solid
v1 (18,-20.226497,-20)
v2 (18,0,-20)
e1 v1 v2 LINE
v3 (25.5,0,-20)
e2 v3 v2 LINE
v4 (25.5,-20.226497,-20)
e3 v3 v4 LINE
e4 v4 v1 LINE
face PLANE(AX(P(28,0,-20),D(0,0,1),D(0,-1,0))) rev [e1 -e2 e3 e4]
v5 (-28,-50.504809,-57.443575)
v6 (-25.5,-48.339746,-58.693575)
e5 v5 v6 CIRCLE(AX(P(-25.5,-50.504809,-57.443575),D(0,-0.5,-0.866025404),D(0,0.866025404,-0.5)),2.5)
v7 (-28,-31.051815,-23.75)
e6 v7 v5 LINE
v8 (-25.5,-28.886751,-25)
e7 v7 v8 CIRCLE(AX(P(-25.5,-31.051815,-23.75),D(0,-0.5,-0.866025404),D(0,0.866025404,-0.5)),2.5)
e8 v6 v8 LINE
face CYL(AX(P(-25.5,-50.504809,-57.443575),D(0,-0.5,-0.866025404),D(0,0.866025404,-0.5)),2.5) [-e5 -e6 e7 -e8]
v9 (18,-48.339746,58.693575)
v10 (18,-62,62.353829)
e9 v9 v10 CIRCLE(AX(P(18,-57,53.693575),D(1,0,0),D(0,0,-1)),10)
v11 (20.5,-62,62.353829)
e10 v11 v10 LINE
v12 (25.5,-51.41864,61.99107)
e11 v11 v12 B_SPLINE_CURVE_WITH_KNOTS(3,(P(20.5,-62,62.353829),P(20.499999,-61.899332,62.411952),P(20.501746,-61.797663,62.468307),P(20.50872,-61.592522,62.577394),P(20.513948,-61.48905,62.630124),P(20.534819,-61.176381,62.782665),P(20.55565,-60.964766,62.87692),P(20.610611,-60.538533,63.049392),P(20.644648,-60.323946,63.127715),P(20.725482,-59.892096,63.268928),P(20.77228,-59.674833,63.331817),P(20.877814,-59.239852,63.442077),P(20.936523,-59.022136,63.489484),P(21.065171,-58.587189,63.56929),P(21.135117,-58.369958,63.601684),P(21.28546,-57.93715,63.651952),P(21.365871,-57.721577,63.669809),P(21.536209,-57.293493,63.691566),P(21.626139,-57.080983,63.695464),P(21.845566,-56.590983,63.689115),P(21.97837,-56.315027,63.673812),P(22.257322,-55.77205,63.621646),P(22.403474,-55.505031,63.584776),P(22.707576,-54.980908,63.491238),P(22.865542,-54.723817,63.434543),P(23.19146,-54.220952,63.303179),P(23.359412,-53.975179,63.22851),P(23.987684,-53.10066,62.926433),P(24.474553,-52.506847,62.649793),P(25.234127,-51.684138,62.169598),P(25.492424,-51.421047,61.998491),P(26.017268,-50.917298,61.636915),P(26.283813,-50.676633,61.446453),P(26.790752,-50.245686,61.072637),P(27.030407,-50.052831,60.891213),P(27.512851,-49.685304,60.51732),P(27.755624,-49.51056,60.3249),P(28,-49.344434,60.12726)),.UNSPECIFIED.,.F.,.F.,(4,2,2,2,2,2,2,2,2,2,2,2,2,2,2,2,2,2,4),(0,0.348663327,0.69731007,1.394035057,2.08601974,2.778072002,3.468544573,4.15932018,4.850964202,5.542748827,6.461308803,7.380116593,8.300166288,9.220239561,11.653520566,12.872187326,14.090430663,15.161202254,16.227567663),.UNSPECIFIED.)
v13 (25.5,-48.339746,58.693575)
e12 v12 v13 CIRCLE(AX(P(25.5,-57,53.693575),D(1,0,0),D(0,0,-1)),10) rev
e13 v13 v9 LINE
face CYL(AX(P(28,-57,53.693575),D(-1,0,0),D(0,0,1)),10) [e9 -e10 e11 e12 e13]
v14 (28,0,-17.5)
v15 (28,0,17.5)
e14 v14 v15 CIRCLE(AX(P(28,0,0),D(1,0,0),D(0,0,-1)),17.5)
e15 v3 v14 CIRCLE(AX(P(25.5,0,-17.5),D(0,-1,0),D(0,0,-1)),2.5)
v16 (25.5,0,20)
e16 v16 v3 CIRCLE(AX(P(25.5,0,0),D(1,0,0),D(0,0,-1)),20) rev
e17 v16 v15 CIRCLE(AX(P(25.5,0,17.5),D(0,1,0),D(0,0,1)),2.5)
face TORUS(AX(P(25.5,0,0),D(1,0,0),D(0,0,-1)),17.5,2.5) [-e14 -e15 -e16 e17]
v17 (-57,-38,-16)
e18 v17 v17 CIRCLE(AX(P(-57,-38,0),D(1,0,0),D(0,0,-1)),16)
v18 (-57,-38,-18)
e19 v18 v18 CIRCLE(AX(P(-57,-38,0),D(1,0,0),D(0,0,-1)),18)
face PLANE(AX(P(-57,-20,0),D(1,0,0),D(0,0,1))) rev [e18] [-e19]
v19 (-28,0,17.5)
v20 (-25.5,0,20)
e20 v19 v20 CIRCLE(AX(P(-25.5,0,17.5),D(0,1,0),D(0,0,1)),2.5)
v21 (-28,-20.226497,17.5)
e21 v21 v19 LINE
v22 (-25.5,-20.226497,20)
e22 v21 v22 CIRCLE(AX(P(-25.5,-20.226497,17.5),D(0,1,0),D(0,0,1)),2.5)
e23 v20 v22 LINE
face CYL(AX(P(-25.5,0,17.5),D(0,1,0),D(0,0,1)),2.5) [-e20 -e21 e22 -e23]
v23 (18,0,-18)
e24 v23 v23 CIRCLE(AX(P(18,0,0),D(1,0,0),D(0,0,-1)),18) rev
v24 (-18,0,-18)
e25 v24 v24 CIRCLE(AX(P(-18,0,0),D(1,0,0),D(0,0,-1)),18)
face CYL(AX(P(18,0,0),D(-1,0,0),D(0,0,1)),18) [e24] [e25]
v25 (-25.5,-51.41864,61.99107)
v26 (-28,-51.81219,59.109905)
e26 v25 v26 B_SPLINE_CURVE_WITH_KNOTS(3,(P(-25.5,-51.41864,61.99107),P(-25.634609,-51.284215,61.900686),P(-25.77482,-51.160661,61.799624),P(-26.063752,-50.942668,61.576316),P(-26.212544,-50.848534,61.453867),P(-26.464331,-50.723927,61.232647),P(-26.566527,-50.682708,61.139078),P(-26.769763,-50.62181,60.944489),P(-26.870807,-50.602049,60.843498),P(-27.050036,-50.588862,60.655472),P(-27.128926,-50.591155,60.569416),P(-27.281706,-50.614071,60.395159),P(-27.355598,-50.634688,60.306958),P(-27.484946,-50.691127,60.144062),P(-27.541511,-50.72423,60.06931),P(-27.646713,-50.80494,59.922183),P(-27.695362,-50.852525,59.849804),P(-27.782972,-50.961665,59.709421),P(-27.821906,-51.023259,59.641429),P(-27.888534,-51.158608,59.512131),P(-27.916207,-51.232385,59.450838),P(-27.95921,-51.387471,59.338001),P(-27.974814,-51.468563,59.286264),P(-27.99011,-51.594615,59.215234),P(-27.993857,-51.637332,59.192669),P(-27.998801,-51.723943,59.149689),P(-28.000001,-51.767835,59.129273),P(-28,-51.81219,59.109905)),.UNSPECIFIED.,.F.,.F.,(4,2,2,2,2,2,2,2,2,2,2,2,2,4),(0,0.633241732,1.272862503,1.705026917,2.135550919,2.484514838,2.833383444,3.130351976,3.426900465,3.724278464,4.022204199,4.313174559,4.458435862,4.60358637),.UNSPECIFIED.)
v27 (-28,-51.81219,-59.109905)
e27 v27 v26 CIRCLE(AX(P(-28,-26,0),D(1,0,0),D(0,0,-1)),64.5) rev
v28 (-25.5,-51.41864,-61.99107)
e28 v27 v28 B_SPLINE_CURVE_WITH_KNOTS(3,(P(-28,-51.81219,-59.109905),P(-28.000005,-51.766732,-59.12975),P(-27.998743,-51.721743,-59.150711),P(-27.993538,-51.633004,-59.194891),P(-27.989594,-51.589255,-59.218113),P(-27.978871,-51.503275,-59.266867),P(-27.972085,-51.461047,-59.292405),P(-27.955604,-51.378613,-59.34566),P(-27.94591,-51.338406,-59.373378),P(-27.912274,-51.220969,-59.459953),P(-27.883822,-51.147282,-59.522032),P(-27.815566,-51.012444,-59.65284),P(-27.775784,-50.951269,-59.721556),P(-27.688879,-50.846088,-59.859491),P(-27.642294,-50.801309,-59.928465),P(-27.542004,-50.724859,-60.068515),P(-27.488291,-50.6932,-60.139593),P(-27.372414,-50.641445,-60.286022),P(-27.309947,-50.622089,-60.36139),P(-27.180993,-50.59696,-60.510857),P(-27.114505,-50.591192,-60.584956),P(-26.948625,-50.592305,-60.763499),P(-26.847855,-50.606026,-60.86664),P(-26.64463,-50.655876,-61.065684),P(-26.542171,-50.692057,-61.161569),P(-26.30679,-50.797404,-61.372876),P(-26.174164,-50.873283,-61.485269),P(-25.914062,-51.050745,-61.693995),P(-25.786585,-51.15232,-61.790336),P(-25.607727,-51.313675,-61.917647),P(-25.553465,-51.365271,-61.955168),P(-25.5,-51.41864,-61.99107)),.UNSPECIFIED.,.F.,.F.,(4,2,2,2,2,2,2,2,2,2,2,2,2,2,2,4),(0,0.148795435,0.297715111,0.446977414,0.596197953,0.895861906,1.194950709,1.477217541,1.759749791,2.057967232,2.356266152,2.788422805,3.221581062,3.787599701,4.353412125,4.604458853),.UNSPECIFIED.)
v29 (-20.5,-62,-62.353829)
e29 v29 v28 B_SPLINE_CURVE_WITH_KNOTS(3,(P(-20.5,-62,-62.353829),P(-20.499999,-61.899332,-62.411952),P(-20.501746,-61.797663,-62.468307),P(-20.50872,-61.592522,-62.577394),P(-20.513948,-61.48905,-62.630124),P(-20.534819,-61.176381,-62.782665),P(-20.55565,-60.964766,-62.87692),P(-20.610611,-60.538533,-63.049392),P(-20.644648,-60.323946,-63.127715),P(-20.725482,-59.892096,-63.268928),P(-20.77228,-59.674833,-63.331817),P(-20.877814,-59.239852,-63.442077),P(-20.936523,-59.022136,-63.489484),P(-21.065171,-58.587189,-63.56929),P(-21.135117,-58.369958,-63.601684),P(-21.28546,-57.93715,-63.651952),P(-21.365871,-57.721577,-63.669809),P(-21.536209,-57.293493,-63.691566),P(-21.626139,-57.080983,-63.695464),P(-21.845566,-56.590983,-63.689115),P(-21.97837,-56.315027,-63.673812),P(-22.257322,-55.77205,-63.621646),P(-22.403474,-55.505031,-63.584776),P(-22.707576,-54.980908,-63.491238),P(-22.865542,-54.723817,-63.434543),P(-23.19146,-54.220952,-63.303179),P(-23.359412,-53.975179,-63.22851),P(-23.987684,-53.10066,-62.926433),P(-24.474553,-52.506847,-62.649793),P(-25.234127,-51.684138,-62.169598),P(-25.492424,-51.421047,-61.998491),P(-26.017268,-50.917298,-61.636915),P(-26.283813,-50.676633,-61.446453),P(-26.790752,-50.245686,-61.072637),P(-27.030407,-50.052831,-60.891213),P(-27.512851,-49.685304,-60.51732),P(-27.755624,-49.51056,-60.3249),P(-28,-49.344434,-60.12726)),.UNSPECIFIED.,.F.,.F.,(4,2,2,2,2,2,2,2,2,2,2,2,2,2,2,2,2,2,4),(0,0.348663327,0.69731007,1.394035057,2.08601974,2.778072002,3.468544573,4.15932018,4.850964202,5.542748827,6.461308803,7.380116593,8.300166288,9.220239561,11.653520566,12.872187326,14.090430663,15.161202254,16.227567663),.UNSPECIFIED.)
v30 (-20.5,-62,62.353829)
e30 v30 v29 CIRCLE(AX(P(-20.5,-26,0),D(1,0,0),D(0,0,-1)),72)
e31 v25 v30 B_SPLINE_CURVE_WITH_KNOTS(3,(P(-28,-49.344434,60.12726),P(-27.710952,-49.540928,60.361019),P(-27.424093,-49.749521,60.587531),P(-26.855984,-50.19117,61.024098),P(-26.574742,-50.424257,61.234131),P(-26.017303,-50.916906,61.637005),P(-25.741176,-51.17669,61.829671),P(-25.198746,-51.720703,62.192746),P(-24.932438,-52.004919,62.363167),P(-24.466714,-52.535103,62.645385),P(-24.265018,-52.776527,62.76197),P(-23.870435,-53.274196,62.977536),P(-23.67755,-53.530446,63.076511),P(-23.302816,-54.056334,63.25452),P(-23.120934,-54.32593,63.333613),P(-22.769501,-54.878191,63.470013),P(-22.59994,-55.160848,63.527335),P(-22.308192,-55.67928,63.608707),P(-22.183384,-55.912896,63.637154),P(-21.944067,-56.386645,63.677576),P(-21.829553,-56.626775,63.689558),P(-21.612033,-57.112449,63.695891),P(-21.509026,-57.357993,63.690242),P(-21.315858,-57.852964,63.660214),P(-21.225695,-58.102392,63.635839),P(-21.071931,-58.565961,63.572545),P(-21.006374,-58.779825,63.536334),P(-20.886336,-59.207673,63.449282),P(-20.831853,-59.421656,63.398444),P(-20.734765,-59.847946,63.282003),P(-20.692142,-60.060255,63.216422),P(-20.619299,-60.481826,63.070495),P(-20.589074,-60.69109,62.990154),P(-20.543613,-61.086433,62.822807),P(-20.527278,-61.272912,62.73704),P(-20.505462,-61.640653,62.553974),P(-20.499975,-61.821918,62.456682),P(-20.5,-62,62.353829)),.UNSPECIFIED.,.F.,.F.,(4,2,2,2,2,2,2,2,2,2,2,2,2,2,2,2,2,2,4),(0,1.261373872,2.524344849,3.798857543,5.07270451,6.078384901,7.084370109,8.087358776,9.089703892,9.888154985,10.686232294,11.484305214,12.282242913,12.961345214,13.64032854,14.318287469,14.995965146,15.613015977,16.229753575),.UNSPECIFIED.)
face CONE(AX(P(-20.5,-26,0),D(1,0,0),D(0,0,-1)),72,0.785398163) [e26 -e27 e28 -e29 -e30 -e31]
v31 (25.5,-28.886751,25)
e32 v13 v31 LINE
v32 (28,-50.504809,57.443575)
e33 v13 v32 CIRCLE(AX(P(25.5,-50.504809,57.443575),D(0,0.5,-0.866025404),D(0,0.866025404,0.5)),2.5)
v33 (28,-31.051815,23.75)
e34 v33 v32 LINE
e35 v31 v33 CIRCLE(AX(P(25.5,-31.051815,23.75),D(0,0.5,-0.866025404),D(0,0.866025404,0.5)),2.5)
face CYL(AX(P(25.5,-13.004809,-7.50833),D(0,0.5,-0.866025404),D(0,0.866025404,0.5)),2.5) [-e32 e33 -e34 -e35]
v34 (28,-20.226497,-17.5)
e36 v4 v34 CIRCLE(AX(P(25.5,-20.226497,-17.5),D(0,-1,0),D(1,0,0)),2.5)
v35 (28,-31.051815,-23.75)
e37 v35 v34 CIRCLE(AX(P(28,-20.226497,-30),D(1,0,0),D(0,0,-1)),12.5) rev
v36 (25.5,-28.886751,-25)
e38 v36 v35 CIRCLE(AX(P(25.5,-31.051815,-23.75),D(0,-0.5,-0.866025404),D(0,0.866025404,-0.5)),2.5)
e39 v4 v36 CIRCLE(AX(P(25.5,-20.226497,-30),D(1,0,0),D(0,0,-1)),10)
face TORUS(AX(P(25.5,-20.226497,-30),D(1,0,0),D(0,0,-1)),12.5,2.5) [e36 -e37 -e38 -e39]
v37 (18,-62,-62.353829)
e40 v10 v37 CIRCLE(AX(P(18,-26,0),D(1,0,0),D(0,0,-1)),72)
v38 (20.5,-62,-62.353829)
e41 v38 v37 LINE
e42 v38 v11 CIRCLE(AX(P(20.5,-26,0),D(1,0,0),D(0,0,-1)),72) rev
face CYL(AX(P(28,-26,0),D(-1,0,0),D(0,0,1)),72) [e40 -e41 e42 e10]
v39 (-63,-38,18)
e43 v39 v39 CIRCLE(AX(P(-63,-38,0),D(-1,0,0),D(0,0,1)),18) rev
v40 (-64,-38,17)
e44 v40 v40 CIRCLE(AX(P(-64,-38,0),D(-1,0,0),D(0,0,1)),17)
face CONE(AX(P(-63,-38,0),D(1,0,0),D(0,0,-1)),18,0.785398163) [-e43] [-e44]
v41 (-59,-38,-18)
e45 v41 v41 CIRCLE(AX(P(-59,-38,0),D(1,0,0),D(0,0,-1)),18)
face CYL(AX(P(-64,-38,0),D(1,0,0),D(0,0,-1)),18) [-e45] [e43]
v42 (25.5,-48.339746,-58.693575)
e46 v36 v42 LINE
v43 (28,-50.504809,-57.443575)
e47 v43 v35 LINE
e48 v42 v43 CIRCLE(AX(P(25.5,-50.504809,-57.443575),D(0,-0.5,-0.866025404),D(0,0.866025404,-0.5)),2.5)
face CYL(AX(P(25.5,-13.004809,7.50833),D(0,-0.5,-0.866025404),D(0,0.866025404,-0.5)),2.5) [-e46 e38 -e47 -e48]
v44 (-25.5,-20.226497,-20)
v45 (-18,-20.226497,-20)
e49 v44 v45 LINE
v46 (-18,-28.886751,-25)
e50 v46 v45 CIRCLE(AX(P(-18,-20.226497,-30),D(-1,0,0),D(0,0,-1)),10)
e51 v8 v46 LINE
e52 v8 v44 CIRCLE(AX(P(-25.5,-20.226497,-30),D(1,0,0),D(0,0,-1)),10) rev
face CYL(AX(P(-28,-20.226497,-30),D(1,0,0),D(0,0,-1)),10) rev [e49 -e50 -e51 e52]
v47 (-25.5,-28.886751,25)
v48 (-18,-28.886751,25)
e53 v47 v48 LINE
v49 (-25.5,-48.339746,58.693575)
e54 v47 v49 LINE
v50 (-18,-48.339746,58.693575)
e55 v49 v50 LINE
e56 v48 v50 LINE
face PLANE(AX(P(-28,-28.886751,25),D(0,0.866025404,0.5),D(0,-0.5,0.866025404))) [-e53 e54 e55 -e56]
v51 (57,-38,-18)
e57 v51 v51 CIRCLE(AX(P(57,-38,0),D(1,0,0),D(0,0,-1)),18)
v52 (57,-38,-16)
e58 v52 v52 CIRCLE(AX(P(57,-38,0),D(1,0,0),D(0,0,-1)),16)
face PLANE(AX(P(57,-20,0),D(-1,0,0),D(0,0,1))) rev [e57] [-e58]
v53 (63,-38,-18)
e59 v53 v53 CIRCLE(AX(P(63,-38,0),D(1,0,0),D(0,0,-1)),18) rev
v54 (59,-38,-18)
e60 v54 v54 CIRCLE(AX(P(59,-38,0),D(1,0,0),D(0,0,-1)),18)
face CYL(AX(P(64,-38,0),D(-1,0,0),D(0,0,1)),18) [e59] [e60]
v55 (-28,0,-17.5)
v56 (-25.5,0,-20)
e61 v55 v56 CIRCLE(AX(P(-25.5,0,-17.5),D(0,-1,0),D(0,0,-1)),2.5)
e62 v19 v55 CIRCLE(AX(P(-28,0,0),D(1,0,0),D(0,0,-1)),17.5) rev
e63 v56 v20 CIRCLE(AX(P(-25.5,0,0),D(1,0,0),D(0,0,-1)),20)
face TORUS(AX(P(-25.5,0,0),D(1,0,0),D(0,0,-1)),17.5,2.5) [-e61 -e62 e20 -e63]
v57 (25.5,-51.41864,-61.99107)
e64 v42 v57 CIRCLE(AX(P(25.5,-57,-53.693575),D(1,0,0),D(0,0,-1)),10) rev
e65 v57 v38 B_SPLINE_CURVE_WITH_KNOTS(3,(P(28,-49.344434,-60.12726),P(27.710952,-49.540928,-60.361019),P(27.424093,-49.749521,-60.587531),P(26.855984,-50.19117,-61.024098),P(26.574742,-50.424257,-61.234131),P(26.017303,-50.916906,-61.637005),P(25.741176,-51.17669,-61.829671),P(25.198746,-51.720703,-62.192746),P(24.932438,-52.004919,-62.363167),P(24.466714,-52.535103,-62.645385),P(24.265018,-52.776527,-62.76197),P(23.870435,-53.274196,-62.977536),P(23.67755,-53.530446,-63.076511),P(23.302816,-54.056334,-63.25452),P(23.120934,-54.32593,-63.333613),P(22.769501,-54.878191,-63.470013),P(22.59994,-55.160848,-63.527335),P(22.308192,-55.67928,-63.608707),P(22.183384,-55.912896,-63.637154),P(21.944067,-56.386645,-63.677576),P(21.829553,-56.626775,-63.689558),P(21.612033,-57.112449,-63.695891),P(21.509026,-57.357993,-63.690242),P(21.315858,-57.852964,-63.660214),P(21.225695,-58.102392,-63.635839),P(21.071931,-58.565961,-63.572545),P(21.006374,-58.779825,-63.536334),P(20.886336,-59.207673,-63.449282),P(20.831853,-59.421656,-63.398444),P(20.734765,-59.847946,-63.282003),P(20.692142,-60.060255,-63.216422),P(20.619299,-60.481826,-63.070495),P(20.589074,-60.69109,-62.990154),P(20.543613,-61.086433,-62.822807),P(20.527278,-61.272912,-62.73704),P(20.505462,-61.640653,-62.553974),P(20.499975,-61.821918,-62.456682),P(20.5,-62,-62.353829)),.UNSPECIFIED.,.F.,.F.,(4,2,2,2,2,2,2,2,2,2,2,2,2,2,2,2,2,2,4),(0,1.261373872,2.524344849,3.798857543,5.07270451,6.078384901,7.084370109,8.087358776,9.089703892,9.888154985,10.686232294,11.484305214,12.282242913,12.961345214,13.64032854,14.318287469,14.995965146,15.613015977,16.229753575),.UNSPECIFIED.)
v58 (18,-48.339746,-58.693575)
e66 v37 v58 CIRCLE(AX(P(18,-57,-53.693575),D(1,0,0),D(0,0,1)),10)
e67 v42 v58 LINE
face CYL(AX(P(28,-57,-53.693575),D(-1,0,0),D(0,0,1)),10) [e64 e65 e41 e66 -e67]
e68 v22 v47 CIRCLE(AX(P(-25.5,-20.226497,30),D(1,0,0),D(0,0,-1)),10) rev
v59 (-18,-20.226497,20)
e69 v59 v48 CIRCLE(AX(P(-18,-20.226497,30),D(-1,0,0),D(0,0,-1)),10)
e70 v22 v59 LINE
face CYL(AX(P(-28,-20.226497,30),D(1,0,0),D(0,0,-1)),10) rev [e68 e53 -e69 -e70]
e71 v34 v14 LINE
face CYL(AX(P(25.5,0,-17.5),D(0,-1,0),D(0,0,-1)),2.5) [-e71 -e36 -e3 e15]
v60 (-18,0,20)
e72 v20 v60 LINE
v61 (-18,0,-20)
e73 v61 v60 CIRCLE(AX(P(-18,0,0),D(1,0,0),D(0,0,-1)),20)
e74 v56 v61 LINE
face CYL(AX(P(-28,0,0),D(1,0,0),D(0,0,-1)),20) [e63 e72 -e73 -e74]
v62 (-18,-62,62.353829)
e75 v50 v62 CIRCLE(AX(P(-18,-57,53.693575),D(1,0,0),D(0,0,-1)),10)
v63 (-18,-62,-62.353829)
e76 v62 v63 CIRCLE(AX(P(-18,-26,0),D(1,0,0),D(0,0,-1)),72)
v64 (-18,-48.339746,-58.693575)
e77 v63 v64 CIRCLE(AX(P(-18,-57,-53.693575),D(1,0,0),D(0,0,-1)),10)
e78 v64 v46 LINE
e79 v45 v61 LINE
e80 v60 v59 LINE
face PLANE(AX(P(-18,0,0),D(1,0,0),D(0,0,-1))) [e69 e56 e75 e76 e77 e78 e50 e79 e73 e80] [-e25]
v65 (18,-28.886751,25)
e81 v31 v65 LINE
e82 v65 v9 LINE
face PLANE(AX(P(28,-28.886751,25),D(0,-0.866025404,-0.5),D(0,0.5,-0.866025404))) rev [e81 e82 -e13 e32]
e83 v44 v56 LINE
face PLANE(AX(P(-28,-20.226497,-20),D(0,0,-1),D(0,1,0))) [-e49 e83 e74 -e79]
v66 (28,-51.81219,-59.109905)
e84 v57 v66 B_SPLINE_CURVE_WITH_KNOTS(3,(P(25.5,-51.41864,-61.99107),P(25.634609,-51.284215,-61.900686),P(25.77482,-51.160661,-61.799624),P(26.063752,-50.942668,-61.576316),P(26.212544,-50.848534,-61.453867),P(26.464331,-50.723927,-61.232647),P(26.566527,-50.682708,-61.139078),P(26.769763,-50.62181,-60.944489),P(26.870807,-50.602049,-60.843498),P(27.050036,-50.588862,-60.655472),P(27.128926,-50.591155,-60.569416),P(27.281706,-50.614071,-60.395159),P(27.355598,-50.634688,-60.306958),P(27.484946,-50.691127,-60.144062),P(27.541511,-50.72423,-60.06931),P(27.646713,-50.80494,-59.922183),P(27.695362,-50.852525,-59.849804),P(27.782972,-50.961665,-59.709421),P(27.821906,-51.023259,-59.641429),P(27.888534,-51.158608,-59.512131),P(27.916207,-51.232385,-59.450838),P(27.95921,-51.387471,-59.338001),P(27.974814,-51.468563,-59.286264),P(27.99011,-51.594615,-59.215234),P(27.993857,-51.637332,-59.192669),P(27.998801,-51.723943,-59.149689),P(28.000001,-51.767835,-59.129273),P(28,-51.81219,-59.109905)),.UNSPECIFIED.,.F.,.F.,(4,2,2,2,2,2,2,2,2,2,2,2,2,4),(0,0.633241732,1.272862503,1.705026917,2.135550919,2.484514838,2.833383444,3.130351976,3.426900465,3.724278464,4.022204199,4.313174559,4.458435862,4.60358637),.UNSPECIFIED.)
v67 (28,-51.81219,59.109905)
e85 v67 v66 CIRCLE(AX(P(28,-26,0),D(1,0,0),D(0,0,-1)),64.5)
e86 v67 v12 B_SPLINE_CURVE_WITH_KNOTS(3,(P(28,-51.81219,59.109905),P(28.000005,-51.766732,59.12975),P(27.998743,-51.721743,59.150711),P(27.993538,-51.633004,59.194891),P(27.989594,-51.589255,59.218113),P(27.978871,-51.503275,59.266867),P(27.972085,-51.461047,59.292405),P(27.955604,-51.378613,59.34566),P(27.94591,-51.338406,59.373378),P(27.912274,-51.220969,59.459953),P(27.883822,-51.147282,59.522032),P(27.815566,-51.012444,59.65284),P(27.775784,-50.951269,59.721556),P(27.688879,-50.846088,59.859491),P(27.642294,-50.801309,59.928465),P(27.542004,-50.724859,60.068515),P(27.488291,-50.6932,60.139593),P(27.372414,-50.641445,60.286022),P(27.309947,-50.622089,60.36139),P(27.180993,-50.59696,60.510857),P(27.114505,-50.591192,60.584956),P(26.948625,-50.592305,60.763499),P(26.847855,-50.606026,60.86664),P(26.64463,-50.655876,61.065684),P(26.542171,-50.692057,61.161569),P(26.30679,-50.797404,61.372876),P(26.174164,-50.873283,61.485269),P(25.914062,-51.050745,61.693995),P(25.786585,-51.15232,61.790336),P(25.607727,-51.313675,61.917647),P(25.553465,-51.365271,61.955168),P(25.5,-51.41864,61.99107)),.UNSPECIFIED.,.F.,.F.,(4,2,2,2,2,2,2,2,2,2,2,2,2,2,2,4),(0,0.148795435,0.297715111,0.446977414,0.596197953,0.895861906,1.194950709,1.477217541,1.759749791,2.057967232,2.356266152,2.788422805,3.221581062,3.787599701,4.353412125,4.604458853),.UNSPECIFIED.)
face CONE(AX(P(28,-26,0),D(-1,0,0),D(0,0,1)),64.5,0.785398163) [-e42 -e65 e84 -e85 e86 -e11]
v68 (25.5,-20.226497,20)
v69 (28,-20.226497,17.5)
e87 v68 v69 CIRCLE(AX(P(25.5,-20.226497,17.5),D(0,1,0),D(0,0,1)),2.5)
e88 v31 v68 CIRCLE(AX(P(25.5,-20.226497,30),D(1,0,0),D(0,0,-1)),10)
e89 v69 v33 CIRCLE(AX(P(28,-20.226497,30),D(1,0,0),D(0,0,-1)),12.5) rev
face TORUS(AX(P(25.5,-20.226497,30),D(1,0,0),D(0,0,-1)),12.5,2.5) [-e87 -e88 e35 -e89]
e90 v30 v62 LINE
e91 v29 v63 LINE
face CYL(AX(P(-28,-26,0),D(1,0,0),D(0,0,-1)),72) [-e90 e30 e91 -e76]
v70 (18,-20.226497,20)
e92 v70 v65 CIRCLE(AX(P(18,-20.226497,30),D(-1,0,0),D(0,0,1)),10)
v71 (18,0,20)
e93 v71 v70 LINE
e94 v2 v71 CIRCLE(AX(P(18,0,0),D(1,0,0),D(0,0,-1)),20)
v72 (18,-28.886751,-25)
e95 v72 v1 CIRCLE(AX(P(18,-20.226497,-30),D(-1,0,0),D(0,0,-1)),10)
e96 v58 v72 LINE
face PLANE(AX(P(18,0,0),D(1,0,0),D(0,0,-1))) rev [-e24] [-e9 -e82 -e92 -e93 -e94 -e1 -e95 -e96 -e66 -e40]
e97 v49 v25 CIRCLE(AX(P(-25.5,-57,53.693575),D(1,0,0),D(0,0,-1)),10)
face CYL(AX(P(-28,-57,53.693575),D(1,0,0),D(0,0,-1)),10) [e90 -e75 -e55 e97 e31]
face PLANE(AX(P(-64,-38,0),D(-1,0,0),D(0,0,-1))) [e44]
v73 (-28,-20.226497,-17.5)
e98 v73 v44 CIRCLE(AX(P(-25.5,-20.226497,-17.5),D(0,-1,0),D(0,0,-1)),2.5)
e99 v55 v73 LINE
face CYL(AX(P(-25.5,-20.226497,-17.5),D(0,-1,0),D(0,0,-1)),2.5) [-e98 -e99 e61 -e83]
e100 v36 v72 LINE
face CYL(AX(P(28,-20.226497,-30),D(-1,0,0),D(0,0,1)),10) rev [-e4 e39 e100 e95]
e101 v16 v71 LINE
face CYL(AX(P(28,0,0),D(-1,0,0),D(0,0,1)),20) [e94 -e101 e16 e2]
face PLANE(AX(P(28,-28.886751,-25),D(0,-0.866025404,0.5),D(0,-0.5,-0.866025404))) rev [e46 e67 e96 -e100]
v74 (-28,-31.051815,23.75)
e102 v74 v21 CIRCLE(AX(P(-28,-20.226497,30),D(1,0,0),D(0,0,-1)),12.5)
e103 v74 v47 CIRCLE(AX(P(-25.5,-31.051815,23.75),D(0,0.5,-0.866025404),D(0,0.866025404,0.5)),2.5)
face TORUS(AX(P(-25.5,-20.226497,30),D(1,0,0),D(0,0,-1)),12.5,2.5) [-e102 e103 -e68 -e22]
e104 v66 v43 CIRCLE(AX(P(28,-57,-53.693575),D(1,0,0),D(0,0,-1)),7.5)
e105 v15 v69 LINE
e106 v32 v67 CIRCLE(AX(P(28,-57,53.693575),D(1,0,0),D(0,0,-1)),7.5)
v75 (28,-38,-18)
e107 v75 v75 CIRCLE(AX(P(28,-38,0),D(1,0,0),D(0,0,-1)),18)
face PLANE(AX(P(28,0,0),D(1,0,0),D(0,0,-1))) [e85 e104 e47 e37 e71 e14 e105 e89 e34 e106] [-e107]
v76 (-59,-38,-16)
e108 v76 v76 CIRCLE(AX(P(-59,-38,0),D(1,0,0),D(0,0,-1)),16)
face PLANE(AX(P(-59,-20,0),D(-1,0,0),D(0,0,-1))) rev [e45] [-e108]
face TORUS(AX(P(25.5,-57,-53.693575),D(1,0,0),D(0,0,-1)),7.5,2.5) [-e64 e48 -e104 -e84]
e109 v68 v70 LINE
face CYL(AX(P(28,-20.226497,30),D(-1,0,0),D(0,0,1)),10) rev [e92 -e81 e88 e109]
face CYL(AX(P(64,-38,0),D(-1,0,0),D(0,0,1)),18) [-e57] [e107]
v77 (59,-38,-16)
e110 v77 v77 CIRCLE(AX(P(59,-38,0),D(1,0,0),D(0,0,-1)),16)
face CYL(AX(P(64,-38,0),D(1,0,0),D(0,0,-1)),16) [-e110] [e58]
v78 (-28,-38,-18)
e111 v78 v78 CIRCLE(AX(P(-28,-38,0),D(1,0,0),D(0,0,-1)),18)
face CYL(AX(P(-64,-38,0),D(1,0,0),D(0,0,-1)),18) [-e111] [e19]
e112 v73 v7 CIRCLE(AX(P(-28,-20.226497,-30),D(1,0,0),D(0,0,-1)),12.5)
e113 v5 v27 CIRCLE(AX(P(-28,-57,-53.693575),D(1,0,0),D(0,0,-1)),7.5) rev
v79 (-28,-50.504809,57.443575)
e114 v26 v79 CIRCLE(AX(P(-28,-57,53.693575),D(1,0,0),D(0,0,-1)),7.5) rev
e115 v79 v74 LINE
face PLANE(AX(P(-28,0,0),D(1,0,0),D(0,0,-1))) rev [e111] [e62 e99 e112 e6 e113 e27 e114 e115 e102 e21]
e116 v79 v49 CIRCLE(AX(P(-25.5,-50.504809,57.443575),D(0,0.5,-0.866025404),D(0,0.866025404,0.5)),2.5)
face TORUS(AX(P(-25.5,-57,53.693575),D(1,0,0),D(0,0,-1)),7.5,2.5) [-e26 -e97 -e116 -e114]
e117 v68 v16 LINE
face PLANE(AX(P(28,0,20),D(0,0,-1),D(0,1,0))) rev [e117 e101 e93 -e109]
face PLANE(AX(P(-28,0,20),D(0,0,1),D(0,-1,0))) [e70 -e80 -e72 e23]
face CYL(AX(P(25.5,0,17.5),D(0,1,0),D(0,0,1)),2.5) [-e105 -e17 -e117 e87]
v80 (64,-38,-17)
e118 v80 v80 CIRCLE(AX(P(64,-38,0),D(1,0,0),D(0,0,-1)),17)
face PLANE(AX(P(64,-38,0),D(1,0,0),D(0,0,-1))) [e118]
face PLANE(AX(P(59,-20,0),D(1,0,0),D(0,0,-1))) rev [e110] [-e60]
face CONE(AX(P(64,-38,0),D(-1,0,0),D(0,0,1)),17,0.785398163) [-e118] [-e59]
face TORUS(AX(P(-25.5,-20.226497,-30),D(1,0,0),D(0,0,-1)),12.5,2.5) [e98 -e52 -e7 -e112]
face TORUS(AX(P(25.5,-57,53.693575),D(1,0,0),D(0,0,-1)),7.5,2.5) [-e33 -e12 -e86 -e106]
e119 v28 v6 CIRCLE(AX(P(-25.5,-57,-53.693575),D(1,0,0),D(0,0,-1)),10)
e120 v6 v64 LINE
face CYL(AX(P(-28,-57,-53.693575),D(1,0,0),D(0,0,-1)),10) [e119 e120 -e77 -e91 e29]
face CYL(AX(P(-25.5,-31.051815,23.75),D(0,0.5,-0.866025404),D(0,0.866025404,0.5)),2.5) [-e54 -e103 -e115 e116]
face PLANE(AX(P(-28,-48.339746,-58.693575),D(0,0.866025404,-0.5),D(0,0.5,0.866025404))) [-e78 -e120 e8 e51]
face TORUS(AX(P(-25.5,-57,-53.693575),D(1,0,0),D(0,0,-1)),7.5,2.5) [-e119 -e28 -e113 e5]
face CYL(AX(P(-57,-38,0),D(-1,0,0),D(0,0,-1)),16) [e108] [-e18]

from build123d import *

# Parameters (mm, degrees)
BOSS_EXTRUDE1_DEPTH      = 10
CHAMFER1_SIZE            = 7.5
FILLET1_R                = 2.5
BOSS_EXTRUDE2_DEPTH      = 10
CHAMFER2_SIZE            = 7.5
FILLET2_R                = 2.5
SKETCH3_R                = 18
BOSS_EXTRUDE3_DEPTH      = 18
SKETCH4_R                = 18
BOSS_EXTRUDE4_DEPTH      = 36
SKETCH5_W                = 2
SKETCH5_H                = 2
CHAMFER3_SIZE            = 1
CHAMFER3_OF_MIRROR1_SIZE = 1


with BuildPart() as part:
    # Sketch1 → Boss-Extrude1 (new body)
    with BuildSketch(Plane(origin=(18, 0, 0), x_dir=(0, 0, -1), z_dir=(1, 0, 0))):
        with BuildLine():
            Line((-25, -28.886751346), (-58.693575035, -48.339745962))
            ThreePointArc((-58.693575035, -48.339745962), (-63.352833298, -54.411809549), (-62.353829072, -62))
            ThreePointArc((-62.353829072, -62), (0, -98), (62.353829072, -62))
            ThreePointArc((62.353829072, -62), (63.352833298, -54.411809549), (58.693575035, -48.339745962))
            Line((58.693575035, -48.339745962), (25, -28.886751346))
            ThreePointArc((25, -28.886751346), (21.339745962, -25.226497308), (20, -20.226497308))
            Line((20, -20.226497308), (20, 0))
            ThreePointArc((20, 0), (0, 20), (-20, 0))
            Line((-20, 0), (-20, -20.226497308))
            ThreePointArc((-20, -20.226497308), (-21.339745962, -25.226497308), (-25, -28.886751346))
        make_face()
    extrude(amount=BOSS_EXTRUDE1_DEPTH)

    # Chamfer1
    # the kernel refuses this chamfer: 7.5 mm, written as the material it takes off along each edge
    with BuildSketch(Plane(origin=(28, -26, 0), x_dir=(0, -0.2527522173180771, 0.9675310416936479), z_dir=(0, 0.9675310416936479, 0.2527522173180771))) as chamfer1_piece_1:
        Polygon((72, -CHAMFER1_SIZE), (72 - CHAMFER1_SIZE, 0), (72, 0), align=None)
    revolve(axis=Axis((28, -26, 0), (1, 0, 0)), revolution_arc=150.719131607, mode=Mode.SUBTRACT)

    # Fillet1
    fillet1_edges = [part.edges().sort_by_distance(p)[0] for p in [
        (28, -48.810655601, -59.432445857),
        (28, -38.613248654, -41.846787517),
        (28, -25.226497308, -21.339745962),
        (28, -10.113248654, -20),
        (28, -48.810655601, 59.432445857),
        (28, -38.613248654, 41.846787517),
        (28, -25.226497308, 21.339745962),
        (28, -10.113248654, 20),
        (28, 20, 0),
    ]]
    fillet(fillet1_edges, radius=FILLET1_R)



with BuildPart() as body_2:
    # Sketch2 → Boss-Extrude2 (new body)
    with BuildSketch(Plane(origin=(-18, 0, 0), x_dir=(0, 0, -1), z_dir=(1, 0, 0))):
        with BuildLine():
            Line((20, -20.226497308), (20, 0))
            ThreePointArc((20, 0), (0, 20), (-20, 0))
            Line((-20, 0), (-20, -20.226497308))
            ThreePointArc((-20, -20.226497308), (-21.339745962, -25.226497308), (-25, -28.886751346))
            Line((-25, -28.886751346), (-58.693575035, -48.339745962))
            ThreePointArc((-58.693575035, -48.339745962), (-63.352833298, -54.411809549), (-62.353829072, -62))
            ThreePointArc((-62.353829072, -62), (0, -98), (62.353829072, -62))
            ThreePointArc((62.353829072, -62), (63.352833298, -54.411809549), (58.693575035, -48.339745962))
            Line((58.693575035, -48.339745962), (25, -28.886751346))
            ThreePointArc((25, -28.886751346), (21.339745962, -25.226497308), (20, -20.226497308))
        make_face()
    extrude(amount=-BOSS_EXTRUDE2_DEPTH)

    # Chamfer2
    # the kernel refuses this chamfer: 7.5 mm, written as the material it takes off along each edge
    with BuildSketch(Plane(origin=(-28, -26, 0), x_dir=(0, -0.25275221731807723, 0.9675310416936479), z_dir=(0, 0.9675310416936479, 0.25275221731807723))) as chamfer2_piece_1:
        Polygon((72, CHAMFER2_SIZE), (72 - CHAMFER2_SIZE, 0), (72, 0), align=None)
    revolve(axis=Axis((-28, -26, 0), (1, 0, 0)), revolution_arc=150.719131607, mode=Mode.SUBTRACT)

    # Fillet2
    fillet2_edges = [body_2.edges().sort_by_distance(p)[0] for p in [
        (-28, -48.810655601, -59.432445857),
        (-28, -38.613248654, -41.846787517),
        (-28, -25.226497308, -21.339745962),
        (-28, -10.113248654, -20),
        (-28, -48.810655601, 59.432445857),
        (-28, -38.613248654, 41.846787517),
        (-28, -25.226497308, 21.339745962),
        (-28, -10.113248654, 20),
        (-28, 20, 0),
    ]]
    fillet(fillet2_edges, radius=FILLET2_R)


with BuildPart() as part_1:
    add(part.part)

    add(body_2.part)  # Boss-Extrude3 merges body 2
    # Sketch3 → Boss-Extrude3 (add, symmetric)
    with BuildSketch(Plane(origin=(0, 0, 0), x_dir=(0, 0, -1), z_dir=(1, 0, 0))):
        Circle(SKETCH3_R)
    extrude(amount=BOSS_EXTRUDE3_DEPTH, both=True)

    # Sketch4 → Boss-Extrude4 (add)
    with BuildSketch(Plane(origin=(28, 0, 0), x_dir=(0, 0, -1), z_dir=(1, 0, 0))):
        with Locations((0, -38)):
            Circle(SKETCH4_R)
    boss_extrude4 = extrude(amount=BOSS_EXTRUDE4_DEPTH)

    # Sketch5 → Cut-Revolve1 (revolve, cut)
    with BuildSketch(Plane.XY, mode=Mode.PRIVATE) as cut_revolve1_sk:
        with Locations((58, -21)):
            Rectangle(SKETCH5_W, SKETCH5_H)
    cut_revolve1 = revolve(cut_revolve1_sk.sketch.rotate(Axis((64, -38, 0), (-1, 0, 0)), 90), axis=Axis((64, -38, 0), (-1, 0, 0)), mode=Mode.SUBTRACT)

    # Chamfer3
    chamfer3_edges = [part_1.edges().sort_by_distance(p)[0] for p in [
        (64, -38, 18),
    ]]
    chamfer(chamfer3_edges, length=CHAMFER3_SIZE)

    # Mirror1: Boss-Extrude4, Cut-Revolve1 across plane
    add(boss_extrude4.mirror(Plane(origin=(0, 0, 0), x_dir=(0, 0, 1), z_dir=(1, 0, 0))))
    add(cut_revolve1.mirror(Plane(origin=(0, 0, 0), x_dir=(0, 0, 1), z_dir=(1, 0, 0))), mode=Mode.SUBTRACT)

    # Chamfer3 of Mirror1
    chamfer3_of_mirror1_edges = [part_1.edges().sort_by_distance(p)[0] for p in [
        (-64, -38, 18),
    ]]
    chamfer(chamfer3_of_mirror1_edges, length=CHAMFER3_OF_MIRROR1_SIZE)


solid = part_1.part
